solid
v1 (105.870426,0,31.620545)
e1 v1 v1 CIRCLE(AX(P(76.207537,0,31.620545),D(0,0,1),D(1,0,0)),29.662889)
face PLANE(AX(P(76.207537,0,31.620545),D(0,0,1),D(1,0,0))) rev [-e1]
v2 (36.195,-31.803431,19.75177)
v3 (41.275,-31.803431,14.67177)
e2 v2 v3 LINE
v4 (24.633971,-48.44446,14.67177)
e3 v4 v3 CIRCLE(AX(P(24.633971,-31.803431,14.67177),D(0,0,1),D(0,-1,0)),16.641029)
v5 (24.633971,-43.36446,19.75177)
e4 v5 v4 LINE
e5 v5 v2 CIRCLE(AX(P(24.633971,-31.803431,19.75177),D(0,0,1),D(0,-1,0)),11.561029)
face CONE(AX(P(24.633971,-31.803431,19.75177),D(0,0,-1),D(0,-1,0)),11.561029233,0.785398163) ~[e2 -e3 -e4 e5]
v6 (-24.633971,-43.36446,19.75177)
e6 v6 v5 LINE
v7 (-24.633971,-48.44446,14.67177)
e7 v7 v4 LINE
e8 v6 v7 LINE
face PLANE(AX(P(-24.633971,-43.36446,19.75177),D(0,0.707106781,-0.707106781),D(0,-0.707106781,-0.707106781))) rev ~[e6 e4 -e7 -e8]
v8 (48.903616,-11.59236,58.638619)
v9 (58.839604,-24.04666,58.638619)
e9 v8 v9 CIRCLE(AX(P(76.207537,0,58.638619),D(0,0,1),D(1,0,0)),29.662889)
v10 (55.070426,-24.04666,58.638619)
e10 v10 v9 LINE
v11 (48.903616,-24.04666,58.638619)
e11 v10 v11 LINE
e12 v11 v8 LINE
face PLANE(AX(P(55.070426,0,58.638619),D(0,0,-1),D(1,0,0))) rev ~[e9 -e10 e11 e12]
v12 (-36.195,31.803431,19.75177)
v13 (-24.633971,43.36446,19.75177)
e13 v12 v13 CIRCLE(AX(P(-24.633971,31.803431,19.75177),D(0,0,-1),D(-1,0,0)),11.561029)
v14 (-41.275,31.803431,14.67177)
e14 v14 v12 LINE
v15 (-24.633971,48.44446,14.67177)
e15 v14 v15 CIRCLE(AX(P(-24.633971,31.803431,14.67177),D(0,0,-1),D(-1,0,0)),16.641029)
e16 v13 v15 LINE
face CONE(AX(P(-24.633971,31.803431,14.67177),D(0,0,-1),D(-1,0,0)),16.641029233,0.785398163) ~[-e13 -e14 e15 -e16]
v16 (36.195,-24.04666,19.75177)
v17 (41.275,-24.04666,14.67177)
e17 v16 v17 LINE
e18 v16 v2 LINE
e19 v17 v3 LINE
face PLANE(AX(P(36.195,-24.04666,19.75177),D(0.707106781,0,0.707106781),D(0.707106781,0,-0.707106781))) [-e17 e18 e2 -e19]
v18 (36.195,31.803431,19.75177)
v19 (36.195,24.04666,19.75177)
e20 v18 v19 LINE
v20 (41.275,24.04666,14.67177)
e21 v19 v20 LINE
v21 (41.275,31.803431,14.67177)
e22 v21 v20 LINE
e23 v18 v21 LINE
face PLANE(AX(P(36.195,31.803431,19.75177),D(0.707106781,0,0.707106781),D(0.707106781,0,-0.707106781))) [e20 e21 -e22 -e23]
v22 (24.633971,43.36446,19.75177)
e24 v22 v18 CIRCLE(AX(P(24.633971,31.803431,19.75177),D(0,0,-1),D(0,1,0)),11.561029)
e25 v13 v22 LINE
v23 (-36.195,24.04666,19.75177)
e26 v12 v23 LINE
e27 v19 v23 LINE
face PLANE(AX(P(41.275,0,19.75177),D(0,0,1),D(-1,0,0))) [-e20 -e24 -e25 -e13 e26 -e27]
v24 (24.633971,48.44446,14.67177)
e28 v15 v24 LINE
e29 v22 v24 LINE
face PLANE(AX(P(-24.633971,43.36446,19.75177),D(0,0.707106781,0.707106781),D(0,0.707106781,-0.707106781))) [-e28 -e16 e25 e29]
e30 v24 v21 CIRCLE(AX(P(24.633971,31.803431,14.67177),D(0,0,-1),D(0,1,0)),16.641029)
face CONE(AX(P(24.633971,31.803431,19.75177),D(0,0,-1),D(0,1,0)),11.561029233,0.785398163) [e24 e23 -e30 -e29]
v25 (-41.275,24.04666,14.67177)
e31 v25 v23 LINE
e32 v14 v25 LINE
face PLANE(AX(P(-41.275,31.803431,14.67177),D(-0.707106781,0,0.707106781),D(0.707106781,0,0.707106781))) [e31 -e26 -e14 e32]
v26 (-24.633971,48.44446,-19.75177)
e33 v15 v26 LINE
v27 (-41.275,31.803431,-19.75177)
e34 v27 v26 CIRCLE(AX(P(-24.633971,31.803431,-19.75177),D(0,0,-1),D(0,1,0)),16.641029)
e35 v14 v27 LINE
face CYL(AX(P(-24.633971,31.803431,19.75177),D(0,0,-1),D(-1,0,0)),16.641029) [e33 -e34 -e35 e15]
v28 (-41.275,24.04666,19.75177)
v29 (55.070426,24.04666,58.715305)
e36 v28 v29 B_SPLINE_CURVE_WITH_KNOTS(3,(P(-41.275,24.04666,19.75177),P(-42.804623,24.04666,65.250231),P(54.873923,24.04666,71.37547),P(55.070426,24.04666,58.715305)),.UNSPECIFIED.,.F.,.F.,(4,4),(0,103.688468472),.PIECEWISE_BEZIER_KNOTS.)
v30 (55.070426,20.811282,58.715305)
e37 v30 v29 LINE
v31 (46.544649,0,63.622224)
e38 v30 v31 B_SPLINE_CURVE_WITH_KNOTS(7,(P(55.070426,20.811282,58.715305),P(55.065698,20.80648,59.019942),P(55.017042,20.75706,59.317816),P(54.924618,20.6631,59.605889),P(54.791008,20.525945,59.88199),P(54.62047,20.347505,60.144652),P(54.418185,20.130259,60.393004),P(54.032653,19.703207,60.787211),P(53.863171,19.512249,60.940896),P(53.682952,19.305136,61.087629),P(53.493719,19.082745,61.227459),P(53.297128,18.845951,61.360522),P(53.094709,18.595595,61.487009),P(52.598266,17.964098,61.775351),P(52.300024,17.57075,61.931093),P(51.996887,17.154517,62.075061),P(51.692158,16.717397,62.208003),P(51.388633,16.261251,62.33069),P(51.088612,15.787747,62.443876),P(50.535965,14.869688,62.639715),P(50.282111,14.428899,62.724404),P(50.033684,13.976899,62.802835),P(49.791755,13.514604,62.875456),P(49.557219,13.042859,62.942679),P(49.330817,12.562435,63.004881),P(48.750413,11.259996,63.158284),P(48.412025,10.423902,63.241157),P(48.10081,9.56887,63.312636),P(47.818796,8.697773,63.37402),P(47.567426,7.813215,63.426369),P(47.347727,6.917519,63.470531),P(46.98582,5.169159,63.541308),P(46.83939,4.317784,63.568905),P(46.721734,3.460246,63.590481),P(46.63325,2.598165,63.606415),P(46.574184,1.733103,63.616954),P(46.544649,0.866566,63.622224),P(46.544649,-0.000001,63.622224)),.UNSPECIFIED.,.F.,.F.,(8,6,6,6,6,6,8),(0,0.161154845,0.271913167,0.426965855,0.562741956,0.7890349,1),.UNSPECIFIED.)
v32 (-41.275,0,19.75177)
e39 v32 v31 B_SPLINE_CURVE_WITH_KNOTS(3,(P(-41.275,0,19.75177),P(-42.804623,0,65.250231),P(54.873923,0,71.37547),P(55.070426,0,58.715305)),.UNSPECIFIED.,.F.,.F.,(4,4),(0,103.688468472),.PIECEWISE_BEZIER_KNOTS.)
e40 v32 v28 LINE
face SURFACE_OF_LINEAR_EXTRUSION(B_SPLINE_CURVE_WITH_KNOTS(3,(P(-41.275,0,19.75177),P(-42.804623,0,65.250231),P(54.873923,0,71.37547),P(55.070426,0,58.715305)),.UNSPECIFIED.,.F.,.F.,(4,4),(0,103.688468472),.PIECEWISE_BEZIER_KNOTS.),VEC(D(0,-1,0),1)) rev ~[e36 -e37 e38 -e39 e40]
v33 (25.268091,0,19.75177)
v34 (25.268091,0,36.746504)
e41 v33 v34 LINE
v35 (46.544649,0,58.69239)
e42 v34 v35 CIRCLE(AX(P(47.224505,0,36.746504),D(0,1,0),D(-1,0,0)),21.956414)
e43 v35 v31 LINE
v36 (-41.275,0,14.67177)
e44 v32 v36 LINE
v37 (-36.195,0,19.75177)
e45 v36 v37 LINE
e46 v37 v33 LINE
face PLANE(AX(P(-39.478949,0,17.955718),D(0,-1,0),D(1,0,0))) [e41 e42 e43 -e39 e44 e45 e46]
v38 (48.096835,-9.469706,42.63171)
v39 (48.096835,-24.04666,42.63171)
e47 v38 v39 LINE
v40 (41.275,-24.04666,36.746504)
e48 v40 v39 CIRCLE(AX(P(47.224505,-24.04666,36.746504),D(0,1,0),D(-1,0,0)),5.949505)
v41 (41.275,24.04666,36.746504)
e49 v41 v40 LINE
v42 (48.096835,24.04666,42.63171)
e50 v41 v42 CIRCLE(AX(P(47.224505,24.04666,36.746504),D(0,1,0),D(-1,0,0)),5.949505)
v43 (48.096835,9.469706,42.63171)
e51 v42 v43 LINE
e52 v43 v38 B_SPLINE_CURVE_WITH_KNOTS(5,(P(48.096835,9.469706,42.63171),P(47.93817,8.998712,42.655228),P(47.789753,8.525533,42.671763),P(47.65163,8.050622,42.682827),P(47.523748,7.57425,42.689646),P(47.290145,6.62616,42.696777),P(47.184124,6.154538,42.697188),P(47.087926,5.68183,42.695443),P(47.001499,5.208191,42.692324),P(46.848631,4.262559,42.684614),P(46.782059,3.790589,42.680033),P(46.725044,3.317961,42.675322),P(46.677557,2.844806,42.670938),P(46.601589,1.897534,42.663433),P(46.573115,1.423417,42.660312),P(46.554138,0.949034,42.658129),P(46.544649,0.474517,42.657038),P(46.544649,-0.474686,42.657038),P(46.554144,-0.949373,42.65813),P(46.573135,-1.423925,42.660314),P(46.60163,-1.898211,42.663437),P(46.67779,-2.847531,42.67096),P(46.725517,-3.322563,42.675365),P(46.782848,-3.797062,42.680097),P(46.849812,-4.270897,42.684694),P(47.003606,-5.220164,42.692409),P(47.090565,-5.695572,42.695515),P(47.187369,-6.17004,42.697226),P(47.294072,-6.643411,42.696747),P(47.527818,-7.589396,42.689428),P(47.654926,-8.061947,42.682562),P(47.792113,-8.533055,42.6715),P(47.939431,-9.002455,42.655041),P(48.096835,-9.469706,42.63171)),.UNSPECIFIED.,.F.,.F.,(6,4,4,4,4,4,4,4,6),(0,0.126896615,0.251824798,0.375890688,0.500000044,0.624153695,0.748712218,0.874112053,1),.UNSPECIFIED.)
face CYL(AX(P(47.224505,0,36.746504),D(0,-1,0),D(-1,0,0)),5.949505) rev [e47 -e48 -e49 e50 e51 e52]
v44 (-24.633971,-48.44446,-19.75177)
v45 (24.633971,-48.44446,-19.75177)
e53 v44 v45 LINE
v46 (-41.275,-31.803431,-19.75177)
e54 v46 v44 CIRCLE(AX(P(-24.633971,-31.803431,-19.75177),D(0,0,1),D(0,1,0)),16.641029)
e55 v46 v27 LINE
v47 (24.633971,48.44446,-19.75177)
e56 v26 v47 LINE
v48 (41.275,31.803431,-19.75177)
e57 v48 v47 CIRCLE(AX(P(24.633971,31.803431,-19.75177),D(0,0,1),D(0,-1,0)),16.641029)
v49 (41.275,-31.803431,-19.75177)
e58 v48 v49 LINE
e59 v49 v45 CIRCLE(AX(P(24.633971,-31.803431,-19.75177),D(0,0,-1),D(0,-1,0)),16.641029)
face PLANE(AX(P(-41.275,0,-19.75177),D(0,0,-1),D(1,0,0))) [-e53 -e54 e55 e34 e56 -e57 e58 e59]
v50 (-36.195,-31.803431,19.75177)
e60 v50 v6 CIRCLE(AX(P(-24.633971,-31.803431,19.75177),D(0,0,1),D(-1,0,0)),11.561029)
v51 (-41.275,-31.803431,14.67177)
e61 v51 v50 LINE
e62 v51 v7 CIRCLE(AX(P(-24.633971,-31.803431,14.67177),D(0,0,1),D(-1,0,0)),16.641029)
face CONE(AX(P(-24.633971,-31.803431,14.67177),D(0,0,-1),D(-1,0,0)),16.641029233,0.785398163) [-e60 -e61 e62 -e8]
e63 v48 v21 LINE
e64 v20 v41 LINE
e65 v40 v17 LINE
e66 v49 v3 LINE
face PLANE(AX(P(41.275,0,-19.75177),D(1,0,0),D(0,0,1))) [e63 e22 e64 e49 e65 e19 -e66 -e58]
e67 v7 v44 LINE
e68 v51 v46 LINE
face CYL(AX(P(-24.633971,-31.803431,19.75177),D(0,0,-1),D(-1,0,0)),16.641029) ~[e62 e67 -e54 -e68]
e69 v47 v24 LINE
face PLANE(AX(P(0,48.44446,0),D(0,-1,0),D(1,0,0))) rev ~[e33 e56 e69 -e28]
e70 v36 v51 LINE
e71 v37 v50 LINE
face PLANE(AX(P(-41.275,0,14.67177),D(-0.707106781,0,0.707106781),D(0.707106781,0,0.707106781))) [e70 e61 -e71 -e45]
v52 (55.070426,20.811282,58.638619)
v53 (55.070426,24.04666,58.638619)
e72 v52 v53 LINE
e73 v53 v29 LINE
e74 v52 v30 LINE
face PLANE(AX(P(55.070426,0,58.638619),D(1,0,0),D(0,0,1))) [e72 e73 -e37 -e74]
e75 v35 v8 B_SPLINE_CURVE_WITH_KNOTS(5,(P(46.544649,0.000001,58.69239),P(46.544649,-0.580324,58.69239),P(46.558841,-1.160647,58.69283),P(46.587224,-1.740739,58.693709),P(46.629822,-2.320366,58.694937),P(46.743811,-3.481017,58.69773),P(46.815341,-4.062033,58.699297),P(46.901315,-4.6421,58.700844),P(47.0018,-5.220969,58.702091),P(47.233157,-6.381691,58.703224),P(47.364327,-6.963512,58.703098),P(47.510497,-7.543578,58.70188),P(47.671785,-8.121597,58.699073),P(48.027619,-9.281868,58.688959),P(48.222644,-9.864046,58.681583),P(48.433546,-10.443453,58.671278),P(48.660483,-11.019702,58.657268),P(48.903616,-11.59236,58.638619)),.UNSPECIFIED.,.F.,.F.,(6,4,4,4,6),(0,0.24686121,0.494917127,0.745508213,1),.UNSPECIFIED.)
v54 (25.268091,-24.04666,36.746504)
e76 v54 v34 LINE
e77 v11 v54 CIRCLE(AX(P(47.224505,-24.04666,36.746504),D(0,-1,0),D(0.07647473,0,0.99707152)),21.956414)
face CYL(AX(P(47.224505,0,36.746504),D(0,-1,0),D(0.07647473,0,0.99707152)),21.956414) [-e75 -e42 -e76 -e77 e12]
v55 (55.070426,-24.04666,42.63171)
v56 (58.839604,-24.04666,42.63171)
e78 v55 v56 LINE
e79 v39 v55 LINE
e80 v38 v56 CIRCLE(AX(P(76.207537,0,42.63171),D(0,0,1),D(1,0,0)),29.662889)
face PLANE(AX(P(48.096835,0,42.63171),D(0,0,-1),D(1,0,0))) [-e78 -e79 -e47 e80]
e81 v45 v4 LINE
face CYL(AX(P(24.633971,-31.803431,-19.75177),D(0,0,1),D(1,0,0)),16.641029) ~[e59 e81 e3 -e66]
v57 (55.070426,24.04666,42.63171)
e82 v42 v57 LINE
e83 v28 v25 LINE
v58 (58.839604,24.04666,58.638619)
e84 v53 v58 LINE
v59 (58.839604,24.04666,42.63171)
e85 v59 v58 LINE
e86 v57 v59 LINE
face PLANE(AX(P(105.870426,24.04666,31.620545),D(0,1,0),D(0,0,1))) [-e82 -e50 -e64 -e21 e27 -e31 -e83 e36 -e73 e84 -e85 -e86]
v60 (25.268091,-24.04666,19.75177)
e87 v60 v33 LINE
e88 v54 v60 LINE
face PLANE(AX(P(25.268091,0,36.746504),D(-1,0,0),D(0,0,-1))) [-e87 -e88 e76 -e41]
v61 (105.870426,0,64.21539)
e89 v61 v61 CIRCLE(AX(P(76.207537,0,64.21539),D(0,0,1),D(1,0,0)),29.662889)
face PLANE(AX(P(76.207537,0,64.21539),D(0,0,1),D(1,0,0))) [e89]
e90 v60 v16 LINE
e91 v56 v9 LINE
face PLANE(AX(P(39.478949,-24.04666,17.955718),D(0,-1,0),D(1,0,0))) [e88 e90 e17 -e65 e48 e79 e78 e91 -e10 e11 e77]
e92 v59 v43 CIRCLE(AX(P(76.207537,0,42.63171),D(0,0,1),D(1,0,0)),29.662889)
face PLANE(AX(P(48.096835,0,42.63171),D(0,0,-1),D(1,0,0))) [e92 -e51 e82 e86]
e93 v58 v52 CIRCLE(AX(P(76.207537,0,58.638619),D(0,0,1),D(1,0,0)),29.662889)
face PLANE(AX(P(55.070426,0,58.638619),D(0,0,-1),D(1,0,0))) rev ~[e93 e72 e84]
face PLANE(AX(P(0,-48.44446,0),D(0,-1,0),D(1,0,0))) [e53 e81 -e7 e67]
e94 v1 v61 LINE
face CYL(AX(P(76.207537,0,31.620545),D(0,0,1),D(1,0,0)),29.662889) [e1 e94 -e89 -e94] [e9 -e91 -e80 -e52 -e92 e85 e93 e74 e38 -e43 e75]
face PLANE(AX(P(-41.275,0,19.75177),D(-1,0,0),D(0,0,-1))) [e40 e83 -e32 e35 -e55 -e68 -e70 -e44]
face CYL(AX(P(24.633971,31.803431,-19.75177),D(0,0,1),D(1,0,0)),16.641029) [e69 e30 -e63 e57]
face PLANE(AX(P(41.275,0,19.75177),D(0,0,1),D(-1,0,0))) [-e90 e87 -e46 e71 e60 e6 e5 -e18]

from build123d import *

# Parameters (mm, degrees)
F1_DEPTH     = 48.44446
F0_W         = 21.137111498
F0_H         = 16.0069091111
F2_DEPTH     = 24.04666
F3_DEPTH     = 24.04666
F4_DEPTH     = 15.49987
F5_DEPTH     = 16.86318
F7_R         = 16.6410292326
F8_T1_DEPTH  = 49.2679415348
F8_T3_DEPTH  = 7.7567707674
F8_T5_DEPTH  = 31.8034307674
F8_T7_DEPTH  = 7.7567707674
F8_T10_ANGLE = 90
F8_T12_ANGLE = 90
F8_T14_ANGLE = 90
F8_T16_ANGLE = 90


# Not quite as in the source:
# - a fillet or chamfer that OpenCascade refuses, or shapes differently, is made with other operations: its cross-section is extruded or revolved along the edge and cut away or added


with BuildPart() as f1:
    # F0 (on Front) → F1 (new body, symmetric)
    with BuildSketch(Plane.XZ):
        Polygon((-41.275, -19.751769717), (41.275, -19.751769717), (41.275, 19.751769717), (25.2680908889, 19.751769717), (-41.275, 19.751769717), align=None)
    extrude(amount=F1_DEPTH, both=True)

    # F0 (on Front) → F2 (join, symmetric)
    with BuildSketch(Plane.XZ):
        with BuildLine():
            Line((25.2680908889, 19.751769717), (41.275, 19.751769717))
            Line((41.275, 19.751769717), (41.275, 36.7465044527))
            ThreePointArc((41.275, 36.7465044527), (43.3382033754, 41.2513095059), (48.0968345152, 42.6317103213))
            Line((48.0968345152, 42.6317103213), (55.0704259122, 42.6317103213))
            Line((55.0704259122, 42.6317103213), (55.0704259122, 58.6386194325))
            Line((55.0704259122, 58.6386194325), (48.9036156195, 58.6386194325))
            ThreePointArc((48.9036156195, 58.6386194325), (32.3044367766, 52.8547533301), (25.2680908889, 36.7465044527))
            Line((25.2680908889, 36.7465044527), (25.2680908889, 19.751769717))
        make_face()
        with Locations((65.6389816612, 50.6351648769)):
            Rectangle(F0_W, F0_H)
        Polygon((76.2075374102, 64.215389511), (76.2075374102, 58.6386194325), (76.2075374102, 42.6317103213), (76.2075374102, 31.6205449668), (105.8704259122, 31.6205449668), (105.8704259122, 64.215389511), align=None)
    extrude(amount=F2_DEPTH, both=True)

    # F0 (on Front) → F3 (join, through all)
    with BuildSketch(Plane.XZ):
        with BuildLine():
            add(Edge.make_bspline(
                [(-41.275, 19.751769717), (-42.804622746, 65.2502314703), (54.8739225948, 71.3754703993), (55.0704259122, 58.7153048291)],
                knots=[0, 0, 0, 0, 103.688468472, 103.688468472, 103.688468472, 103.688468472], degree=3))
            Line((-41.275, 19.751769717), (25.2680908889, 19.751769717))
            Line((25.2680908889, 19.751769717), (25.2680908889, 36.7465044527))
            ThreePointArc((25.2680908889, 36.7465044527), (32.3044367766, 52.8547533301), (48.9036156195, 58.6386194325))
            Line((48.9036156195, 58.6386194325), (55.0704259122, 58.6386194325))
            Line((55.0704259122, 58.6386194325), (55.0704259122, 58.7153048291))
        make_face()
    extrude(amount=-F3_DEPTH)

    # F4 (add): a face of the model
    f4_faces = [f1.faces().sort_by_distance(p)[0] for p in [
        (105.8704259122, 0, 47.9179672389),
    ]]
    extrude(f4_faces, amount=-F4_DEPTH)

    # F5 (cut): a face of the model
    f5_faces = [f1.faces().sort_by_distance(p)[0] for p in [
        (105.8704259122, 0, 47.9179672389),
    ]]
    extrude(f5_faces, amount=-F5_DEPTH, mode=Mode.SUBTRACT)

    # F0 (on Front) → F6 (revolve)
    with BuildSketch(Plane.XZ):
        Polygon((76.2075374102, 64.215389511), (76.2075374102, 58.6386194325), (76.2075374102, 42.6317103213), (76.2075374102, 31.6205449668), (105.8704259122, 31.6205449668), (105.8704259122, 64.215389511), align=None)
    revolve(axis=Axis((76.2075374102, 0, 47.9179672389), (0, 0, 1)))

    # F7
    f7_edges = [f1.edges().sort_by_distance(p)[0] for p in [
        (-41.275, -48.44446, 0),
        (41.275, -48.44446, 0),
        (41.275, 48.44446, 0),
        (-41.275, 48.44446, 0),
    ]]
    fillet(f7_edges, radius=F7_R)

    # F8: chamfer of 5.08 on 2 edges, made by hand

    # F8_s2 → F8_t1 (cut)
    with BuildSketch(Plane.YZ.offset(-24.6339707674)):
        Polygon((43.36446, 19.751769717), (48.44446, 14.671769717), (48.44446, 19.751769717), align=None)
        Polygon((-43.36446, 19.751769717), (-48.44446, 14.671769717), (-48.44446, 19.751769717), align=None)
    extrude(amount=F8_T1_DEPTH, mode=Mode.SUBTRACT)

    # F8_s4 → F8_t3 (cut)
    with BuildSketch(Plane.XZ.offset(24.04666)):
        Polygon((36.195, 19.751769717), (41.275, 14.671769717), (41.275, 19.751769717), align=None)
    extrude(amount=F8_T3_DEPTH, mode=Mode.SUBTRACT)

    # F8_s6 → F8_t5 (cut)
    with BuildSketch(Plane.XZ):
        Polygon((-41.275, 14.671769717), (-36.195, 19.751769717), (-41.275, 19.751769717), align=None)
    extrude(amount=F8_T5_DEPTH, mode=Mode.SUBTRACT)

    # F8_s8 → F8_t7 (cut)
    with BuildSketch(Plane.XZ.offset(-31.8034307674)):
        Polygon((-41.275, 14.671769717), (-36.195, 19.751769717), (-41.275, 19.751769717), align=None)
        Polygon((36.195, 19.751769717), (41.275, 14.671769717), (41.275, 19.751769717), align=None)
    extrude(amount=F8_T7_DEPTH, mode=Mode.SUBTRACT)

    # F8_s9 → F8_t10 (revolve, cut)
    with BuildSketch(Plane.XZ.offset(31.8034307674)):
        Polygon((-41.275, 14.671769717), (-36.195, 19.751769717), (-41.275, 19.751769717), align=None)
    revolve(axis=Axis((-24.6339707674, -31.8034307674, 19.751769717), (0, 0, 1)), revolution_arc=F8_T10_ANGLE, mode=Mode.SUBTRACT)

    # F8_s11 → F8_t12 (revolve, cut)
    with BuildSketch(Plane.YZ.offset(24.6339707674)):
        Polygon((-43.36446, 19.751769717), (-48.44446, 14.671769717), (-48.44446, 19.751769717), align=None)
    revolve(axis=Axis((24.6339707674, -31.8034307674, 19.751769717), (0, 0, 1)), revolution_arc=F8_T12_ANGLE, mode=Mode.SUBTRACT)

    # F8_s13 → F8_t14 (revolve, cut)
    with BuildSketch(Plane.YZ.offset(24.6339707674)):
        Polygon((43.36446, 19.751769717), (48.44446, 14.671769717), (48.44446, 19.751769717), align=None)
    revolve(axis=Axis((24.6339707674, 31.8034307674, 19.751769717), (0, 0, -1)), revolution_arc=F8_T14_ANGLE, mode=Mode.SUBTRACT)

    # F8_s15 → F8_t16 (revolve, cut)
    with BuildSketch(Plane.XZ.offset(-31.8034307674)):
        Polygon((-41.275, 14.671769717), (-36.195, 19.751769717), (-41.275, 19.751769717), align=None)
    revolve(axis=Axis((-24.6339707674, 31.8034307674, 19.751769717), (0, 0, -1)), revolution_arc=F8_T16_ANGLE, mode=Mode.SUBTRACT)


solid = f1.part
